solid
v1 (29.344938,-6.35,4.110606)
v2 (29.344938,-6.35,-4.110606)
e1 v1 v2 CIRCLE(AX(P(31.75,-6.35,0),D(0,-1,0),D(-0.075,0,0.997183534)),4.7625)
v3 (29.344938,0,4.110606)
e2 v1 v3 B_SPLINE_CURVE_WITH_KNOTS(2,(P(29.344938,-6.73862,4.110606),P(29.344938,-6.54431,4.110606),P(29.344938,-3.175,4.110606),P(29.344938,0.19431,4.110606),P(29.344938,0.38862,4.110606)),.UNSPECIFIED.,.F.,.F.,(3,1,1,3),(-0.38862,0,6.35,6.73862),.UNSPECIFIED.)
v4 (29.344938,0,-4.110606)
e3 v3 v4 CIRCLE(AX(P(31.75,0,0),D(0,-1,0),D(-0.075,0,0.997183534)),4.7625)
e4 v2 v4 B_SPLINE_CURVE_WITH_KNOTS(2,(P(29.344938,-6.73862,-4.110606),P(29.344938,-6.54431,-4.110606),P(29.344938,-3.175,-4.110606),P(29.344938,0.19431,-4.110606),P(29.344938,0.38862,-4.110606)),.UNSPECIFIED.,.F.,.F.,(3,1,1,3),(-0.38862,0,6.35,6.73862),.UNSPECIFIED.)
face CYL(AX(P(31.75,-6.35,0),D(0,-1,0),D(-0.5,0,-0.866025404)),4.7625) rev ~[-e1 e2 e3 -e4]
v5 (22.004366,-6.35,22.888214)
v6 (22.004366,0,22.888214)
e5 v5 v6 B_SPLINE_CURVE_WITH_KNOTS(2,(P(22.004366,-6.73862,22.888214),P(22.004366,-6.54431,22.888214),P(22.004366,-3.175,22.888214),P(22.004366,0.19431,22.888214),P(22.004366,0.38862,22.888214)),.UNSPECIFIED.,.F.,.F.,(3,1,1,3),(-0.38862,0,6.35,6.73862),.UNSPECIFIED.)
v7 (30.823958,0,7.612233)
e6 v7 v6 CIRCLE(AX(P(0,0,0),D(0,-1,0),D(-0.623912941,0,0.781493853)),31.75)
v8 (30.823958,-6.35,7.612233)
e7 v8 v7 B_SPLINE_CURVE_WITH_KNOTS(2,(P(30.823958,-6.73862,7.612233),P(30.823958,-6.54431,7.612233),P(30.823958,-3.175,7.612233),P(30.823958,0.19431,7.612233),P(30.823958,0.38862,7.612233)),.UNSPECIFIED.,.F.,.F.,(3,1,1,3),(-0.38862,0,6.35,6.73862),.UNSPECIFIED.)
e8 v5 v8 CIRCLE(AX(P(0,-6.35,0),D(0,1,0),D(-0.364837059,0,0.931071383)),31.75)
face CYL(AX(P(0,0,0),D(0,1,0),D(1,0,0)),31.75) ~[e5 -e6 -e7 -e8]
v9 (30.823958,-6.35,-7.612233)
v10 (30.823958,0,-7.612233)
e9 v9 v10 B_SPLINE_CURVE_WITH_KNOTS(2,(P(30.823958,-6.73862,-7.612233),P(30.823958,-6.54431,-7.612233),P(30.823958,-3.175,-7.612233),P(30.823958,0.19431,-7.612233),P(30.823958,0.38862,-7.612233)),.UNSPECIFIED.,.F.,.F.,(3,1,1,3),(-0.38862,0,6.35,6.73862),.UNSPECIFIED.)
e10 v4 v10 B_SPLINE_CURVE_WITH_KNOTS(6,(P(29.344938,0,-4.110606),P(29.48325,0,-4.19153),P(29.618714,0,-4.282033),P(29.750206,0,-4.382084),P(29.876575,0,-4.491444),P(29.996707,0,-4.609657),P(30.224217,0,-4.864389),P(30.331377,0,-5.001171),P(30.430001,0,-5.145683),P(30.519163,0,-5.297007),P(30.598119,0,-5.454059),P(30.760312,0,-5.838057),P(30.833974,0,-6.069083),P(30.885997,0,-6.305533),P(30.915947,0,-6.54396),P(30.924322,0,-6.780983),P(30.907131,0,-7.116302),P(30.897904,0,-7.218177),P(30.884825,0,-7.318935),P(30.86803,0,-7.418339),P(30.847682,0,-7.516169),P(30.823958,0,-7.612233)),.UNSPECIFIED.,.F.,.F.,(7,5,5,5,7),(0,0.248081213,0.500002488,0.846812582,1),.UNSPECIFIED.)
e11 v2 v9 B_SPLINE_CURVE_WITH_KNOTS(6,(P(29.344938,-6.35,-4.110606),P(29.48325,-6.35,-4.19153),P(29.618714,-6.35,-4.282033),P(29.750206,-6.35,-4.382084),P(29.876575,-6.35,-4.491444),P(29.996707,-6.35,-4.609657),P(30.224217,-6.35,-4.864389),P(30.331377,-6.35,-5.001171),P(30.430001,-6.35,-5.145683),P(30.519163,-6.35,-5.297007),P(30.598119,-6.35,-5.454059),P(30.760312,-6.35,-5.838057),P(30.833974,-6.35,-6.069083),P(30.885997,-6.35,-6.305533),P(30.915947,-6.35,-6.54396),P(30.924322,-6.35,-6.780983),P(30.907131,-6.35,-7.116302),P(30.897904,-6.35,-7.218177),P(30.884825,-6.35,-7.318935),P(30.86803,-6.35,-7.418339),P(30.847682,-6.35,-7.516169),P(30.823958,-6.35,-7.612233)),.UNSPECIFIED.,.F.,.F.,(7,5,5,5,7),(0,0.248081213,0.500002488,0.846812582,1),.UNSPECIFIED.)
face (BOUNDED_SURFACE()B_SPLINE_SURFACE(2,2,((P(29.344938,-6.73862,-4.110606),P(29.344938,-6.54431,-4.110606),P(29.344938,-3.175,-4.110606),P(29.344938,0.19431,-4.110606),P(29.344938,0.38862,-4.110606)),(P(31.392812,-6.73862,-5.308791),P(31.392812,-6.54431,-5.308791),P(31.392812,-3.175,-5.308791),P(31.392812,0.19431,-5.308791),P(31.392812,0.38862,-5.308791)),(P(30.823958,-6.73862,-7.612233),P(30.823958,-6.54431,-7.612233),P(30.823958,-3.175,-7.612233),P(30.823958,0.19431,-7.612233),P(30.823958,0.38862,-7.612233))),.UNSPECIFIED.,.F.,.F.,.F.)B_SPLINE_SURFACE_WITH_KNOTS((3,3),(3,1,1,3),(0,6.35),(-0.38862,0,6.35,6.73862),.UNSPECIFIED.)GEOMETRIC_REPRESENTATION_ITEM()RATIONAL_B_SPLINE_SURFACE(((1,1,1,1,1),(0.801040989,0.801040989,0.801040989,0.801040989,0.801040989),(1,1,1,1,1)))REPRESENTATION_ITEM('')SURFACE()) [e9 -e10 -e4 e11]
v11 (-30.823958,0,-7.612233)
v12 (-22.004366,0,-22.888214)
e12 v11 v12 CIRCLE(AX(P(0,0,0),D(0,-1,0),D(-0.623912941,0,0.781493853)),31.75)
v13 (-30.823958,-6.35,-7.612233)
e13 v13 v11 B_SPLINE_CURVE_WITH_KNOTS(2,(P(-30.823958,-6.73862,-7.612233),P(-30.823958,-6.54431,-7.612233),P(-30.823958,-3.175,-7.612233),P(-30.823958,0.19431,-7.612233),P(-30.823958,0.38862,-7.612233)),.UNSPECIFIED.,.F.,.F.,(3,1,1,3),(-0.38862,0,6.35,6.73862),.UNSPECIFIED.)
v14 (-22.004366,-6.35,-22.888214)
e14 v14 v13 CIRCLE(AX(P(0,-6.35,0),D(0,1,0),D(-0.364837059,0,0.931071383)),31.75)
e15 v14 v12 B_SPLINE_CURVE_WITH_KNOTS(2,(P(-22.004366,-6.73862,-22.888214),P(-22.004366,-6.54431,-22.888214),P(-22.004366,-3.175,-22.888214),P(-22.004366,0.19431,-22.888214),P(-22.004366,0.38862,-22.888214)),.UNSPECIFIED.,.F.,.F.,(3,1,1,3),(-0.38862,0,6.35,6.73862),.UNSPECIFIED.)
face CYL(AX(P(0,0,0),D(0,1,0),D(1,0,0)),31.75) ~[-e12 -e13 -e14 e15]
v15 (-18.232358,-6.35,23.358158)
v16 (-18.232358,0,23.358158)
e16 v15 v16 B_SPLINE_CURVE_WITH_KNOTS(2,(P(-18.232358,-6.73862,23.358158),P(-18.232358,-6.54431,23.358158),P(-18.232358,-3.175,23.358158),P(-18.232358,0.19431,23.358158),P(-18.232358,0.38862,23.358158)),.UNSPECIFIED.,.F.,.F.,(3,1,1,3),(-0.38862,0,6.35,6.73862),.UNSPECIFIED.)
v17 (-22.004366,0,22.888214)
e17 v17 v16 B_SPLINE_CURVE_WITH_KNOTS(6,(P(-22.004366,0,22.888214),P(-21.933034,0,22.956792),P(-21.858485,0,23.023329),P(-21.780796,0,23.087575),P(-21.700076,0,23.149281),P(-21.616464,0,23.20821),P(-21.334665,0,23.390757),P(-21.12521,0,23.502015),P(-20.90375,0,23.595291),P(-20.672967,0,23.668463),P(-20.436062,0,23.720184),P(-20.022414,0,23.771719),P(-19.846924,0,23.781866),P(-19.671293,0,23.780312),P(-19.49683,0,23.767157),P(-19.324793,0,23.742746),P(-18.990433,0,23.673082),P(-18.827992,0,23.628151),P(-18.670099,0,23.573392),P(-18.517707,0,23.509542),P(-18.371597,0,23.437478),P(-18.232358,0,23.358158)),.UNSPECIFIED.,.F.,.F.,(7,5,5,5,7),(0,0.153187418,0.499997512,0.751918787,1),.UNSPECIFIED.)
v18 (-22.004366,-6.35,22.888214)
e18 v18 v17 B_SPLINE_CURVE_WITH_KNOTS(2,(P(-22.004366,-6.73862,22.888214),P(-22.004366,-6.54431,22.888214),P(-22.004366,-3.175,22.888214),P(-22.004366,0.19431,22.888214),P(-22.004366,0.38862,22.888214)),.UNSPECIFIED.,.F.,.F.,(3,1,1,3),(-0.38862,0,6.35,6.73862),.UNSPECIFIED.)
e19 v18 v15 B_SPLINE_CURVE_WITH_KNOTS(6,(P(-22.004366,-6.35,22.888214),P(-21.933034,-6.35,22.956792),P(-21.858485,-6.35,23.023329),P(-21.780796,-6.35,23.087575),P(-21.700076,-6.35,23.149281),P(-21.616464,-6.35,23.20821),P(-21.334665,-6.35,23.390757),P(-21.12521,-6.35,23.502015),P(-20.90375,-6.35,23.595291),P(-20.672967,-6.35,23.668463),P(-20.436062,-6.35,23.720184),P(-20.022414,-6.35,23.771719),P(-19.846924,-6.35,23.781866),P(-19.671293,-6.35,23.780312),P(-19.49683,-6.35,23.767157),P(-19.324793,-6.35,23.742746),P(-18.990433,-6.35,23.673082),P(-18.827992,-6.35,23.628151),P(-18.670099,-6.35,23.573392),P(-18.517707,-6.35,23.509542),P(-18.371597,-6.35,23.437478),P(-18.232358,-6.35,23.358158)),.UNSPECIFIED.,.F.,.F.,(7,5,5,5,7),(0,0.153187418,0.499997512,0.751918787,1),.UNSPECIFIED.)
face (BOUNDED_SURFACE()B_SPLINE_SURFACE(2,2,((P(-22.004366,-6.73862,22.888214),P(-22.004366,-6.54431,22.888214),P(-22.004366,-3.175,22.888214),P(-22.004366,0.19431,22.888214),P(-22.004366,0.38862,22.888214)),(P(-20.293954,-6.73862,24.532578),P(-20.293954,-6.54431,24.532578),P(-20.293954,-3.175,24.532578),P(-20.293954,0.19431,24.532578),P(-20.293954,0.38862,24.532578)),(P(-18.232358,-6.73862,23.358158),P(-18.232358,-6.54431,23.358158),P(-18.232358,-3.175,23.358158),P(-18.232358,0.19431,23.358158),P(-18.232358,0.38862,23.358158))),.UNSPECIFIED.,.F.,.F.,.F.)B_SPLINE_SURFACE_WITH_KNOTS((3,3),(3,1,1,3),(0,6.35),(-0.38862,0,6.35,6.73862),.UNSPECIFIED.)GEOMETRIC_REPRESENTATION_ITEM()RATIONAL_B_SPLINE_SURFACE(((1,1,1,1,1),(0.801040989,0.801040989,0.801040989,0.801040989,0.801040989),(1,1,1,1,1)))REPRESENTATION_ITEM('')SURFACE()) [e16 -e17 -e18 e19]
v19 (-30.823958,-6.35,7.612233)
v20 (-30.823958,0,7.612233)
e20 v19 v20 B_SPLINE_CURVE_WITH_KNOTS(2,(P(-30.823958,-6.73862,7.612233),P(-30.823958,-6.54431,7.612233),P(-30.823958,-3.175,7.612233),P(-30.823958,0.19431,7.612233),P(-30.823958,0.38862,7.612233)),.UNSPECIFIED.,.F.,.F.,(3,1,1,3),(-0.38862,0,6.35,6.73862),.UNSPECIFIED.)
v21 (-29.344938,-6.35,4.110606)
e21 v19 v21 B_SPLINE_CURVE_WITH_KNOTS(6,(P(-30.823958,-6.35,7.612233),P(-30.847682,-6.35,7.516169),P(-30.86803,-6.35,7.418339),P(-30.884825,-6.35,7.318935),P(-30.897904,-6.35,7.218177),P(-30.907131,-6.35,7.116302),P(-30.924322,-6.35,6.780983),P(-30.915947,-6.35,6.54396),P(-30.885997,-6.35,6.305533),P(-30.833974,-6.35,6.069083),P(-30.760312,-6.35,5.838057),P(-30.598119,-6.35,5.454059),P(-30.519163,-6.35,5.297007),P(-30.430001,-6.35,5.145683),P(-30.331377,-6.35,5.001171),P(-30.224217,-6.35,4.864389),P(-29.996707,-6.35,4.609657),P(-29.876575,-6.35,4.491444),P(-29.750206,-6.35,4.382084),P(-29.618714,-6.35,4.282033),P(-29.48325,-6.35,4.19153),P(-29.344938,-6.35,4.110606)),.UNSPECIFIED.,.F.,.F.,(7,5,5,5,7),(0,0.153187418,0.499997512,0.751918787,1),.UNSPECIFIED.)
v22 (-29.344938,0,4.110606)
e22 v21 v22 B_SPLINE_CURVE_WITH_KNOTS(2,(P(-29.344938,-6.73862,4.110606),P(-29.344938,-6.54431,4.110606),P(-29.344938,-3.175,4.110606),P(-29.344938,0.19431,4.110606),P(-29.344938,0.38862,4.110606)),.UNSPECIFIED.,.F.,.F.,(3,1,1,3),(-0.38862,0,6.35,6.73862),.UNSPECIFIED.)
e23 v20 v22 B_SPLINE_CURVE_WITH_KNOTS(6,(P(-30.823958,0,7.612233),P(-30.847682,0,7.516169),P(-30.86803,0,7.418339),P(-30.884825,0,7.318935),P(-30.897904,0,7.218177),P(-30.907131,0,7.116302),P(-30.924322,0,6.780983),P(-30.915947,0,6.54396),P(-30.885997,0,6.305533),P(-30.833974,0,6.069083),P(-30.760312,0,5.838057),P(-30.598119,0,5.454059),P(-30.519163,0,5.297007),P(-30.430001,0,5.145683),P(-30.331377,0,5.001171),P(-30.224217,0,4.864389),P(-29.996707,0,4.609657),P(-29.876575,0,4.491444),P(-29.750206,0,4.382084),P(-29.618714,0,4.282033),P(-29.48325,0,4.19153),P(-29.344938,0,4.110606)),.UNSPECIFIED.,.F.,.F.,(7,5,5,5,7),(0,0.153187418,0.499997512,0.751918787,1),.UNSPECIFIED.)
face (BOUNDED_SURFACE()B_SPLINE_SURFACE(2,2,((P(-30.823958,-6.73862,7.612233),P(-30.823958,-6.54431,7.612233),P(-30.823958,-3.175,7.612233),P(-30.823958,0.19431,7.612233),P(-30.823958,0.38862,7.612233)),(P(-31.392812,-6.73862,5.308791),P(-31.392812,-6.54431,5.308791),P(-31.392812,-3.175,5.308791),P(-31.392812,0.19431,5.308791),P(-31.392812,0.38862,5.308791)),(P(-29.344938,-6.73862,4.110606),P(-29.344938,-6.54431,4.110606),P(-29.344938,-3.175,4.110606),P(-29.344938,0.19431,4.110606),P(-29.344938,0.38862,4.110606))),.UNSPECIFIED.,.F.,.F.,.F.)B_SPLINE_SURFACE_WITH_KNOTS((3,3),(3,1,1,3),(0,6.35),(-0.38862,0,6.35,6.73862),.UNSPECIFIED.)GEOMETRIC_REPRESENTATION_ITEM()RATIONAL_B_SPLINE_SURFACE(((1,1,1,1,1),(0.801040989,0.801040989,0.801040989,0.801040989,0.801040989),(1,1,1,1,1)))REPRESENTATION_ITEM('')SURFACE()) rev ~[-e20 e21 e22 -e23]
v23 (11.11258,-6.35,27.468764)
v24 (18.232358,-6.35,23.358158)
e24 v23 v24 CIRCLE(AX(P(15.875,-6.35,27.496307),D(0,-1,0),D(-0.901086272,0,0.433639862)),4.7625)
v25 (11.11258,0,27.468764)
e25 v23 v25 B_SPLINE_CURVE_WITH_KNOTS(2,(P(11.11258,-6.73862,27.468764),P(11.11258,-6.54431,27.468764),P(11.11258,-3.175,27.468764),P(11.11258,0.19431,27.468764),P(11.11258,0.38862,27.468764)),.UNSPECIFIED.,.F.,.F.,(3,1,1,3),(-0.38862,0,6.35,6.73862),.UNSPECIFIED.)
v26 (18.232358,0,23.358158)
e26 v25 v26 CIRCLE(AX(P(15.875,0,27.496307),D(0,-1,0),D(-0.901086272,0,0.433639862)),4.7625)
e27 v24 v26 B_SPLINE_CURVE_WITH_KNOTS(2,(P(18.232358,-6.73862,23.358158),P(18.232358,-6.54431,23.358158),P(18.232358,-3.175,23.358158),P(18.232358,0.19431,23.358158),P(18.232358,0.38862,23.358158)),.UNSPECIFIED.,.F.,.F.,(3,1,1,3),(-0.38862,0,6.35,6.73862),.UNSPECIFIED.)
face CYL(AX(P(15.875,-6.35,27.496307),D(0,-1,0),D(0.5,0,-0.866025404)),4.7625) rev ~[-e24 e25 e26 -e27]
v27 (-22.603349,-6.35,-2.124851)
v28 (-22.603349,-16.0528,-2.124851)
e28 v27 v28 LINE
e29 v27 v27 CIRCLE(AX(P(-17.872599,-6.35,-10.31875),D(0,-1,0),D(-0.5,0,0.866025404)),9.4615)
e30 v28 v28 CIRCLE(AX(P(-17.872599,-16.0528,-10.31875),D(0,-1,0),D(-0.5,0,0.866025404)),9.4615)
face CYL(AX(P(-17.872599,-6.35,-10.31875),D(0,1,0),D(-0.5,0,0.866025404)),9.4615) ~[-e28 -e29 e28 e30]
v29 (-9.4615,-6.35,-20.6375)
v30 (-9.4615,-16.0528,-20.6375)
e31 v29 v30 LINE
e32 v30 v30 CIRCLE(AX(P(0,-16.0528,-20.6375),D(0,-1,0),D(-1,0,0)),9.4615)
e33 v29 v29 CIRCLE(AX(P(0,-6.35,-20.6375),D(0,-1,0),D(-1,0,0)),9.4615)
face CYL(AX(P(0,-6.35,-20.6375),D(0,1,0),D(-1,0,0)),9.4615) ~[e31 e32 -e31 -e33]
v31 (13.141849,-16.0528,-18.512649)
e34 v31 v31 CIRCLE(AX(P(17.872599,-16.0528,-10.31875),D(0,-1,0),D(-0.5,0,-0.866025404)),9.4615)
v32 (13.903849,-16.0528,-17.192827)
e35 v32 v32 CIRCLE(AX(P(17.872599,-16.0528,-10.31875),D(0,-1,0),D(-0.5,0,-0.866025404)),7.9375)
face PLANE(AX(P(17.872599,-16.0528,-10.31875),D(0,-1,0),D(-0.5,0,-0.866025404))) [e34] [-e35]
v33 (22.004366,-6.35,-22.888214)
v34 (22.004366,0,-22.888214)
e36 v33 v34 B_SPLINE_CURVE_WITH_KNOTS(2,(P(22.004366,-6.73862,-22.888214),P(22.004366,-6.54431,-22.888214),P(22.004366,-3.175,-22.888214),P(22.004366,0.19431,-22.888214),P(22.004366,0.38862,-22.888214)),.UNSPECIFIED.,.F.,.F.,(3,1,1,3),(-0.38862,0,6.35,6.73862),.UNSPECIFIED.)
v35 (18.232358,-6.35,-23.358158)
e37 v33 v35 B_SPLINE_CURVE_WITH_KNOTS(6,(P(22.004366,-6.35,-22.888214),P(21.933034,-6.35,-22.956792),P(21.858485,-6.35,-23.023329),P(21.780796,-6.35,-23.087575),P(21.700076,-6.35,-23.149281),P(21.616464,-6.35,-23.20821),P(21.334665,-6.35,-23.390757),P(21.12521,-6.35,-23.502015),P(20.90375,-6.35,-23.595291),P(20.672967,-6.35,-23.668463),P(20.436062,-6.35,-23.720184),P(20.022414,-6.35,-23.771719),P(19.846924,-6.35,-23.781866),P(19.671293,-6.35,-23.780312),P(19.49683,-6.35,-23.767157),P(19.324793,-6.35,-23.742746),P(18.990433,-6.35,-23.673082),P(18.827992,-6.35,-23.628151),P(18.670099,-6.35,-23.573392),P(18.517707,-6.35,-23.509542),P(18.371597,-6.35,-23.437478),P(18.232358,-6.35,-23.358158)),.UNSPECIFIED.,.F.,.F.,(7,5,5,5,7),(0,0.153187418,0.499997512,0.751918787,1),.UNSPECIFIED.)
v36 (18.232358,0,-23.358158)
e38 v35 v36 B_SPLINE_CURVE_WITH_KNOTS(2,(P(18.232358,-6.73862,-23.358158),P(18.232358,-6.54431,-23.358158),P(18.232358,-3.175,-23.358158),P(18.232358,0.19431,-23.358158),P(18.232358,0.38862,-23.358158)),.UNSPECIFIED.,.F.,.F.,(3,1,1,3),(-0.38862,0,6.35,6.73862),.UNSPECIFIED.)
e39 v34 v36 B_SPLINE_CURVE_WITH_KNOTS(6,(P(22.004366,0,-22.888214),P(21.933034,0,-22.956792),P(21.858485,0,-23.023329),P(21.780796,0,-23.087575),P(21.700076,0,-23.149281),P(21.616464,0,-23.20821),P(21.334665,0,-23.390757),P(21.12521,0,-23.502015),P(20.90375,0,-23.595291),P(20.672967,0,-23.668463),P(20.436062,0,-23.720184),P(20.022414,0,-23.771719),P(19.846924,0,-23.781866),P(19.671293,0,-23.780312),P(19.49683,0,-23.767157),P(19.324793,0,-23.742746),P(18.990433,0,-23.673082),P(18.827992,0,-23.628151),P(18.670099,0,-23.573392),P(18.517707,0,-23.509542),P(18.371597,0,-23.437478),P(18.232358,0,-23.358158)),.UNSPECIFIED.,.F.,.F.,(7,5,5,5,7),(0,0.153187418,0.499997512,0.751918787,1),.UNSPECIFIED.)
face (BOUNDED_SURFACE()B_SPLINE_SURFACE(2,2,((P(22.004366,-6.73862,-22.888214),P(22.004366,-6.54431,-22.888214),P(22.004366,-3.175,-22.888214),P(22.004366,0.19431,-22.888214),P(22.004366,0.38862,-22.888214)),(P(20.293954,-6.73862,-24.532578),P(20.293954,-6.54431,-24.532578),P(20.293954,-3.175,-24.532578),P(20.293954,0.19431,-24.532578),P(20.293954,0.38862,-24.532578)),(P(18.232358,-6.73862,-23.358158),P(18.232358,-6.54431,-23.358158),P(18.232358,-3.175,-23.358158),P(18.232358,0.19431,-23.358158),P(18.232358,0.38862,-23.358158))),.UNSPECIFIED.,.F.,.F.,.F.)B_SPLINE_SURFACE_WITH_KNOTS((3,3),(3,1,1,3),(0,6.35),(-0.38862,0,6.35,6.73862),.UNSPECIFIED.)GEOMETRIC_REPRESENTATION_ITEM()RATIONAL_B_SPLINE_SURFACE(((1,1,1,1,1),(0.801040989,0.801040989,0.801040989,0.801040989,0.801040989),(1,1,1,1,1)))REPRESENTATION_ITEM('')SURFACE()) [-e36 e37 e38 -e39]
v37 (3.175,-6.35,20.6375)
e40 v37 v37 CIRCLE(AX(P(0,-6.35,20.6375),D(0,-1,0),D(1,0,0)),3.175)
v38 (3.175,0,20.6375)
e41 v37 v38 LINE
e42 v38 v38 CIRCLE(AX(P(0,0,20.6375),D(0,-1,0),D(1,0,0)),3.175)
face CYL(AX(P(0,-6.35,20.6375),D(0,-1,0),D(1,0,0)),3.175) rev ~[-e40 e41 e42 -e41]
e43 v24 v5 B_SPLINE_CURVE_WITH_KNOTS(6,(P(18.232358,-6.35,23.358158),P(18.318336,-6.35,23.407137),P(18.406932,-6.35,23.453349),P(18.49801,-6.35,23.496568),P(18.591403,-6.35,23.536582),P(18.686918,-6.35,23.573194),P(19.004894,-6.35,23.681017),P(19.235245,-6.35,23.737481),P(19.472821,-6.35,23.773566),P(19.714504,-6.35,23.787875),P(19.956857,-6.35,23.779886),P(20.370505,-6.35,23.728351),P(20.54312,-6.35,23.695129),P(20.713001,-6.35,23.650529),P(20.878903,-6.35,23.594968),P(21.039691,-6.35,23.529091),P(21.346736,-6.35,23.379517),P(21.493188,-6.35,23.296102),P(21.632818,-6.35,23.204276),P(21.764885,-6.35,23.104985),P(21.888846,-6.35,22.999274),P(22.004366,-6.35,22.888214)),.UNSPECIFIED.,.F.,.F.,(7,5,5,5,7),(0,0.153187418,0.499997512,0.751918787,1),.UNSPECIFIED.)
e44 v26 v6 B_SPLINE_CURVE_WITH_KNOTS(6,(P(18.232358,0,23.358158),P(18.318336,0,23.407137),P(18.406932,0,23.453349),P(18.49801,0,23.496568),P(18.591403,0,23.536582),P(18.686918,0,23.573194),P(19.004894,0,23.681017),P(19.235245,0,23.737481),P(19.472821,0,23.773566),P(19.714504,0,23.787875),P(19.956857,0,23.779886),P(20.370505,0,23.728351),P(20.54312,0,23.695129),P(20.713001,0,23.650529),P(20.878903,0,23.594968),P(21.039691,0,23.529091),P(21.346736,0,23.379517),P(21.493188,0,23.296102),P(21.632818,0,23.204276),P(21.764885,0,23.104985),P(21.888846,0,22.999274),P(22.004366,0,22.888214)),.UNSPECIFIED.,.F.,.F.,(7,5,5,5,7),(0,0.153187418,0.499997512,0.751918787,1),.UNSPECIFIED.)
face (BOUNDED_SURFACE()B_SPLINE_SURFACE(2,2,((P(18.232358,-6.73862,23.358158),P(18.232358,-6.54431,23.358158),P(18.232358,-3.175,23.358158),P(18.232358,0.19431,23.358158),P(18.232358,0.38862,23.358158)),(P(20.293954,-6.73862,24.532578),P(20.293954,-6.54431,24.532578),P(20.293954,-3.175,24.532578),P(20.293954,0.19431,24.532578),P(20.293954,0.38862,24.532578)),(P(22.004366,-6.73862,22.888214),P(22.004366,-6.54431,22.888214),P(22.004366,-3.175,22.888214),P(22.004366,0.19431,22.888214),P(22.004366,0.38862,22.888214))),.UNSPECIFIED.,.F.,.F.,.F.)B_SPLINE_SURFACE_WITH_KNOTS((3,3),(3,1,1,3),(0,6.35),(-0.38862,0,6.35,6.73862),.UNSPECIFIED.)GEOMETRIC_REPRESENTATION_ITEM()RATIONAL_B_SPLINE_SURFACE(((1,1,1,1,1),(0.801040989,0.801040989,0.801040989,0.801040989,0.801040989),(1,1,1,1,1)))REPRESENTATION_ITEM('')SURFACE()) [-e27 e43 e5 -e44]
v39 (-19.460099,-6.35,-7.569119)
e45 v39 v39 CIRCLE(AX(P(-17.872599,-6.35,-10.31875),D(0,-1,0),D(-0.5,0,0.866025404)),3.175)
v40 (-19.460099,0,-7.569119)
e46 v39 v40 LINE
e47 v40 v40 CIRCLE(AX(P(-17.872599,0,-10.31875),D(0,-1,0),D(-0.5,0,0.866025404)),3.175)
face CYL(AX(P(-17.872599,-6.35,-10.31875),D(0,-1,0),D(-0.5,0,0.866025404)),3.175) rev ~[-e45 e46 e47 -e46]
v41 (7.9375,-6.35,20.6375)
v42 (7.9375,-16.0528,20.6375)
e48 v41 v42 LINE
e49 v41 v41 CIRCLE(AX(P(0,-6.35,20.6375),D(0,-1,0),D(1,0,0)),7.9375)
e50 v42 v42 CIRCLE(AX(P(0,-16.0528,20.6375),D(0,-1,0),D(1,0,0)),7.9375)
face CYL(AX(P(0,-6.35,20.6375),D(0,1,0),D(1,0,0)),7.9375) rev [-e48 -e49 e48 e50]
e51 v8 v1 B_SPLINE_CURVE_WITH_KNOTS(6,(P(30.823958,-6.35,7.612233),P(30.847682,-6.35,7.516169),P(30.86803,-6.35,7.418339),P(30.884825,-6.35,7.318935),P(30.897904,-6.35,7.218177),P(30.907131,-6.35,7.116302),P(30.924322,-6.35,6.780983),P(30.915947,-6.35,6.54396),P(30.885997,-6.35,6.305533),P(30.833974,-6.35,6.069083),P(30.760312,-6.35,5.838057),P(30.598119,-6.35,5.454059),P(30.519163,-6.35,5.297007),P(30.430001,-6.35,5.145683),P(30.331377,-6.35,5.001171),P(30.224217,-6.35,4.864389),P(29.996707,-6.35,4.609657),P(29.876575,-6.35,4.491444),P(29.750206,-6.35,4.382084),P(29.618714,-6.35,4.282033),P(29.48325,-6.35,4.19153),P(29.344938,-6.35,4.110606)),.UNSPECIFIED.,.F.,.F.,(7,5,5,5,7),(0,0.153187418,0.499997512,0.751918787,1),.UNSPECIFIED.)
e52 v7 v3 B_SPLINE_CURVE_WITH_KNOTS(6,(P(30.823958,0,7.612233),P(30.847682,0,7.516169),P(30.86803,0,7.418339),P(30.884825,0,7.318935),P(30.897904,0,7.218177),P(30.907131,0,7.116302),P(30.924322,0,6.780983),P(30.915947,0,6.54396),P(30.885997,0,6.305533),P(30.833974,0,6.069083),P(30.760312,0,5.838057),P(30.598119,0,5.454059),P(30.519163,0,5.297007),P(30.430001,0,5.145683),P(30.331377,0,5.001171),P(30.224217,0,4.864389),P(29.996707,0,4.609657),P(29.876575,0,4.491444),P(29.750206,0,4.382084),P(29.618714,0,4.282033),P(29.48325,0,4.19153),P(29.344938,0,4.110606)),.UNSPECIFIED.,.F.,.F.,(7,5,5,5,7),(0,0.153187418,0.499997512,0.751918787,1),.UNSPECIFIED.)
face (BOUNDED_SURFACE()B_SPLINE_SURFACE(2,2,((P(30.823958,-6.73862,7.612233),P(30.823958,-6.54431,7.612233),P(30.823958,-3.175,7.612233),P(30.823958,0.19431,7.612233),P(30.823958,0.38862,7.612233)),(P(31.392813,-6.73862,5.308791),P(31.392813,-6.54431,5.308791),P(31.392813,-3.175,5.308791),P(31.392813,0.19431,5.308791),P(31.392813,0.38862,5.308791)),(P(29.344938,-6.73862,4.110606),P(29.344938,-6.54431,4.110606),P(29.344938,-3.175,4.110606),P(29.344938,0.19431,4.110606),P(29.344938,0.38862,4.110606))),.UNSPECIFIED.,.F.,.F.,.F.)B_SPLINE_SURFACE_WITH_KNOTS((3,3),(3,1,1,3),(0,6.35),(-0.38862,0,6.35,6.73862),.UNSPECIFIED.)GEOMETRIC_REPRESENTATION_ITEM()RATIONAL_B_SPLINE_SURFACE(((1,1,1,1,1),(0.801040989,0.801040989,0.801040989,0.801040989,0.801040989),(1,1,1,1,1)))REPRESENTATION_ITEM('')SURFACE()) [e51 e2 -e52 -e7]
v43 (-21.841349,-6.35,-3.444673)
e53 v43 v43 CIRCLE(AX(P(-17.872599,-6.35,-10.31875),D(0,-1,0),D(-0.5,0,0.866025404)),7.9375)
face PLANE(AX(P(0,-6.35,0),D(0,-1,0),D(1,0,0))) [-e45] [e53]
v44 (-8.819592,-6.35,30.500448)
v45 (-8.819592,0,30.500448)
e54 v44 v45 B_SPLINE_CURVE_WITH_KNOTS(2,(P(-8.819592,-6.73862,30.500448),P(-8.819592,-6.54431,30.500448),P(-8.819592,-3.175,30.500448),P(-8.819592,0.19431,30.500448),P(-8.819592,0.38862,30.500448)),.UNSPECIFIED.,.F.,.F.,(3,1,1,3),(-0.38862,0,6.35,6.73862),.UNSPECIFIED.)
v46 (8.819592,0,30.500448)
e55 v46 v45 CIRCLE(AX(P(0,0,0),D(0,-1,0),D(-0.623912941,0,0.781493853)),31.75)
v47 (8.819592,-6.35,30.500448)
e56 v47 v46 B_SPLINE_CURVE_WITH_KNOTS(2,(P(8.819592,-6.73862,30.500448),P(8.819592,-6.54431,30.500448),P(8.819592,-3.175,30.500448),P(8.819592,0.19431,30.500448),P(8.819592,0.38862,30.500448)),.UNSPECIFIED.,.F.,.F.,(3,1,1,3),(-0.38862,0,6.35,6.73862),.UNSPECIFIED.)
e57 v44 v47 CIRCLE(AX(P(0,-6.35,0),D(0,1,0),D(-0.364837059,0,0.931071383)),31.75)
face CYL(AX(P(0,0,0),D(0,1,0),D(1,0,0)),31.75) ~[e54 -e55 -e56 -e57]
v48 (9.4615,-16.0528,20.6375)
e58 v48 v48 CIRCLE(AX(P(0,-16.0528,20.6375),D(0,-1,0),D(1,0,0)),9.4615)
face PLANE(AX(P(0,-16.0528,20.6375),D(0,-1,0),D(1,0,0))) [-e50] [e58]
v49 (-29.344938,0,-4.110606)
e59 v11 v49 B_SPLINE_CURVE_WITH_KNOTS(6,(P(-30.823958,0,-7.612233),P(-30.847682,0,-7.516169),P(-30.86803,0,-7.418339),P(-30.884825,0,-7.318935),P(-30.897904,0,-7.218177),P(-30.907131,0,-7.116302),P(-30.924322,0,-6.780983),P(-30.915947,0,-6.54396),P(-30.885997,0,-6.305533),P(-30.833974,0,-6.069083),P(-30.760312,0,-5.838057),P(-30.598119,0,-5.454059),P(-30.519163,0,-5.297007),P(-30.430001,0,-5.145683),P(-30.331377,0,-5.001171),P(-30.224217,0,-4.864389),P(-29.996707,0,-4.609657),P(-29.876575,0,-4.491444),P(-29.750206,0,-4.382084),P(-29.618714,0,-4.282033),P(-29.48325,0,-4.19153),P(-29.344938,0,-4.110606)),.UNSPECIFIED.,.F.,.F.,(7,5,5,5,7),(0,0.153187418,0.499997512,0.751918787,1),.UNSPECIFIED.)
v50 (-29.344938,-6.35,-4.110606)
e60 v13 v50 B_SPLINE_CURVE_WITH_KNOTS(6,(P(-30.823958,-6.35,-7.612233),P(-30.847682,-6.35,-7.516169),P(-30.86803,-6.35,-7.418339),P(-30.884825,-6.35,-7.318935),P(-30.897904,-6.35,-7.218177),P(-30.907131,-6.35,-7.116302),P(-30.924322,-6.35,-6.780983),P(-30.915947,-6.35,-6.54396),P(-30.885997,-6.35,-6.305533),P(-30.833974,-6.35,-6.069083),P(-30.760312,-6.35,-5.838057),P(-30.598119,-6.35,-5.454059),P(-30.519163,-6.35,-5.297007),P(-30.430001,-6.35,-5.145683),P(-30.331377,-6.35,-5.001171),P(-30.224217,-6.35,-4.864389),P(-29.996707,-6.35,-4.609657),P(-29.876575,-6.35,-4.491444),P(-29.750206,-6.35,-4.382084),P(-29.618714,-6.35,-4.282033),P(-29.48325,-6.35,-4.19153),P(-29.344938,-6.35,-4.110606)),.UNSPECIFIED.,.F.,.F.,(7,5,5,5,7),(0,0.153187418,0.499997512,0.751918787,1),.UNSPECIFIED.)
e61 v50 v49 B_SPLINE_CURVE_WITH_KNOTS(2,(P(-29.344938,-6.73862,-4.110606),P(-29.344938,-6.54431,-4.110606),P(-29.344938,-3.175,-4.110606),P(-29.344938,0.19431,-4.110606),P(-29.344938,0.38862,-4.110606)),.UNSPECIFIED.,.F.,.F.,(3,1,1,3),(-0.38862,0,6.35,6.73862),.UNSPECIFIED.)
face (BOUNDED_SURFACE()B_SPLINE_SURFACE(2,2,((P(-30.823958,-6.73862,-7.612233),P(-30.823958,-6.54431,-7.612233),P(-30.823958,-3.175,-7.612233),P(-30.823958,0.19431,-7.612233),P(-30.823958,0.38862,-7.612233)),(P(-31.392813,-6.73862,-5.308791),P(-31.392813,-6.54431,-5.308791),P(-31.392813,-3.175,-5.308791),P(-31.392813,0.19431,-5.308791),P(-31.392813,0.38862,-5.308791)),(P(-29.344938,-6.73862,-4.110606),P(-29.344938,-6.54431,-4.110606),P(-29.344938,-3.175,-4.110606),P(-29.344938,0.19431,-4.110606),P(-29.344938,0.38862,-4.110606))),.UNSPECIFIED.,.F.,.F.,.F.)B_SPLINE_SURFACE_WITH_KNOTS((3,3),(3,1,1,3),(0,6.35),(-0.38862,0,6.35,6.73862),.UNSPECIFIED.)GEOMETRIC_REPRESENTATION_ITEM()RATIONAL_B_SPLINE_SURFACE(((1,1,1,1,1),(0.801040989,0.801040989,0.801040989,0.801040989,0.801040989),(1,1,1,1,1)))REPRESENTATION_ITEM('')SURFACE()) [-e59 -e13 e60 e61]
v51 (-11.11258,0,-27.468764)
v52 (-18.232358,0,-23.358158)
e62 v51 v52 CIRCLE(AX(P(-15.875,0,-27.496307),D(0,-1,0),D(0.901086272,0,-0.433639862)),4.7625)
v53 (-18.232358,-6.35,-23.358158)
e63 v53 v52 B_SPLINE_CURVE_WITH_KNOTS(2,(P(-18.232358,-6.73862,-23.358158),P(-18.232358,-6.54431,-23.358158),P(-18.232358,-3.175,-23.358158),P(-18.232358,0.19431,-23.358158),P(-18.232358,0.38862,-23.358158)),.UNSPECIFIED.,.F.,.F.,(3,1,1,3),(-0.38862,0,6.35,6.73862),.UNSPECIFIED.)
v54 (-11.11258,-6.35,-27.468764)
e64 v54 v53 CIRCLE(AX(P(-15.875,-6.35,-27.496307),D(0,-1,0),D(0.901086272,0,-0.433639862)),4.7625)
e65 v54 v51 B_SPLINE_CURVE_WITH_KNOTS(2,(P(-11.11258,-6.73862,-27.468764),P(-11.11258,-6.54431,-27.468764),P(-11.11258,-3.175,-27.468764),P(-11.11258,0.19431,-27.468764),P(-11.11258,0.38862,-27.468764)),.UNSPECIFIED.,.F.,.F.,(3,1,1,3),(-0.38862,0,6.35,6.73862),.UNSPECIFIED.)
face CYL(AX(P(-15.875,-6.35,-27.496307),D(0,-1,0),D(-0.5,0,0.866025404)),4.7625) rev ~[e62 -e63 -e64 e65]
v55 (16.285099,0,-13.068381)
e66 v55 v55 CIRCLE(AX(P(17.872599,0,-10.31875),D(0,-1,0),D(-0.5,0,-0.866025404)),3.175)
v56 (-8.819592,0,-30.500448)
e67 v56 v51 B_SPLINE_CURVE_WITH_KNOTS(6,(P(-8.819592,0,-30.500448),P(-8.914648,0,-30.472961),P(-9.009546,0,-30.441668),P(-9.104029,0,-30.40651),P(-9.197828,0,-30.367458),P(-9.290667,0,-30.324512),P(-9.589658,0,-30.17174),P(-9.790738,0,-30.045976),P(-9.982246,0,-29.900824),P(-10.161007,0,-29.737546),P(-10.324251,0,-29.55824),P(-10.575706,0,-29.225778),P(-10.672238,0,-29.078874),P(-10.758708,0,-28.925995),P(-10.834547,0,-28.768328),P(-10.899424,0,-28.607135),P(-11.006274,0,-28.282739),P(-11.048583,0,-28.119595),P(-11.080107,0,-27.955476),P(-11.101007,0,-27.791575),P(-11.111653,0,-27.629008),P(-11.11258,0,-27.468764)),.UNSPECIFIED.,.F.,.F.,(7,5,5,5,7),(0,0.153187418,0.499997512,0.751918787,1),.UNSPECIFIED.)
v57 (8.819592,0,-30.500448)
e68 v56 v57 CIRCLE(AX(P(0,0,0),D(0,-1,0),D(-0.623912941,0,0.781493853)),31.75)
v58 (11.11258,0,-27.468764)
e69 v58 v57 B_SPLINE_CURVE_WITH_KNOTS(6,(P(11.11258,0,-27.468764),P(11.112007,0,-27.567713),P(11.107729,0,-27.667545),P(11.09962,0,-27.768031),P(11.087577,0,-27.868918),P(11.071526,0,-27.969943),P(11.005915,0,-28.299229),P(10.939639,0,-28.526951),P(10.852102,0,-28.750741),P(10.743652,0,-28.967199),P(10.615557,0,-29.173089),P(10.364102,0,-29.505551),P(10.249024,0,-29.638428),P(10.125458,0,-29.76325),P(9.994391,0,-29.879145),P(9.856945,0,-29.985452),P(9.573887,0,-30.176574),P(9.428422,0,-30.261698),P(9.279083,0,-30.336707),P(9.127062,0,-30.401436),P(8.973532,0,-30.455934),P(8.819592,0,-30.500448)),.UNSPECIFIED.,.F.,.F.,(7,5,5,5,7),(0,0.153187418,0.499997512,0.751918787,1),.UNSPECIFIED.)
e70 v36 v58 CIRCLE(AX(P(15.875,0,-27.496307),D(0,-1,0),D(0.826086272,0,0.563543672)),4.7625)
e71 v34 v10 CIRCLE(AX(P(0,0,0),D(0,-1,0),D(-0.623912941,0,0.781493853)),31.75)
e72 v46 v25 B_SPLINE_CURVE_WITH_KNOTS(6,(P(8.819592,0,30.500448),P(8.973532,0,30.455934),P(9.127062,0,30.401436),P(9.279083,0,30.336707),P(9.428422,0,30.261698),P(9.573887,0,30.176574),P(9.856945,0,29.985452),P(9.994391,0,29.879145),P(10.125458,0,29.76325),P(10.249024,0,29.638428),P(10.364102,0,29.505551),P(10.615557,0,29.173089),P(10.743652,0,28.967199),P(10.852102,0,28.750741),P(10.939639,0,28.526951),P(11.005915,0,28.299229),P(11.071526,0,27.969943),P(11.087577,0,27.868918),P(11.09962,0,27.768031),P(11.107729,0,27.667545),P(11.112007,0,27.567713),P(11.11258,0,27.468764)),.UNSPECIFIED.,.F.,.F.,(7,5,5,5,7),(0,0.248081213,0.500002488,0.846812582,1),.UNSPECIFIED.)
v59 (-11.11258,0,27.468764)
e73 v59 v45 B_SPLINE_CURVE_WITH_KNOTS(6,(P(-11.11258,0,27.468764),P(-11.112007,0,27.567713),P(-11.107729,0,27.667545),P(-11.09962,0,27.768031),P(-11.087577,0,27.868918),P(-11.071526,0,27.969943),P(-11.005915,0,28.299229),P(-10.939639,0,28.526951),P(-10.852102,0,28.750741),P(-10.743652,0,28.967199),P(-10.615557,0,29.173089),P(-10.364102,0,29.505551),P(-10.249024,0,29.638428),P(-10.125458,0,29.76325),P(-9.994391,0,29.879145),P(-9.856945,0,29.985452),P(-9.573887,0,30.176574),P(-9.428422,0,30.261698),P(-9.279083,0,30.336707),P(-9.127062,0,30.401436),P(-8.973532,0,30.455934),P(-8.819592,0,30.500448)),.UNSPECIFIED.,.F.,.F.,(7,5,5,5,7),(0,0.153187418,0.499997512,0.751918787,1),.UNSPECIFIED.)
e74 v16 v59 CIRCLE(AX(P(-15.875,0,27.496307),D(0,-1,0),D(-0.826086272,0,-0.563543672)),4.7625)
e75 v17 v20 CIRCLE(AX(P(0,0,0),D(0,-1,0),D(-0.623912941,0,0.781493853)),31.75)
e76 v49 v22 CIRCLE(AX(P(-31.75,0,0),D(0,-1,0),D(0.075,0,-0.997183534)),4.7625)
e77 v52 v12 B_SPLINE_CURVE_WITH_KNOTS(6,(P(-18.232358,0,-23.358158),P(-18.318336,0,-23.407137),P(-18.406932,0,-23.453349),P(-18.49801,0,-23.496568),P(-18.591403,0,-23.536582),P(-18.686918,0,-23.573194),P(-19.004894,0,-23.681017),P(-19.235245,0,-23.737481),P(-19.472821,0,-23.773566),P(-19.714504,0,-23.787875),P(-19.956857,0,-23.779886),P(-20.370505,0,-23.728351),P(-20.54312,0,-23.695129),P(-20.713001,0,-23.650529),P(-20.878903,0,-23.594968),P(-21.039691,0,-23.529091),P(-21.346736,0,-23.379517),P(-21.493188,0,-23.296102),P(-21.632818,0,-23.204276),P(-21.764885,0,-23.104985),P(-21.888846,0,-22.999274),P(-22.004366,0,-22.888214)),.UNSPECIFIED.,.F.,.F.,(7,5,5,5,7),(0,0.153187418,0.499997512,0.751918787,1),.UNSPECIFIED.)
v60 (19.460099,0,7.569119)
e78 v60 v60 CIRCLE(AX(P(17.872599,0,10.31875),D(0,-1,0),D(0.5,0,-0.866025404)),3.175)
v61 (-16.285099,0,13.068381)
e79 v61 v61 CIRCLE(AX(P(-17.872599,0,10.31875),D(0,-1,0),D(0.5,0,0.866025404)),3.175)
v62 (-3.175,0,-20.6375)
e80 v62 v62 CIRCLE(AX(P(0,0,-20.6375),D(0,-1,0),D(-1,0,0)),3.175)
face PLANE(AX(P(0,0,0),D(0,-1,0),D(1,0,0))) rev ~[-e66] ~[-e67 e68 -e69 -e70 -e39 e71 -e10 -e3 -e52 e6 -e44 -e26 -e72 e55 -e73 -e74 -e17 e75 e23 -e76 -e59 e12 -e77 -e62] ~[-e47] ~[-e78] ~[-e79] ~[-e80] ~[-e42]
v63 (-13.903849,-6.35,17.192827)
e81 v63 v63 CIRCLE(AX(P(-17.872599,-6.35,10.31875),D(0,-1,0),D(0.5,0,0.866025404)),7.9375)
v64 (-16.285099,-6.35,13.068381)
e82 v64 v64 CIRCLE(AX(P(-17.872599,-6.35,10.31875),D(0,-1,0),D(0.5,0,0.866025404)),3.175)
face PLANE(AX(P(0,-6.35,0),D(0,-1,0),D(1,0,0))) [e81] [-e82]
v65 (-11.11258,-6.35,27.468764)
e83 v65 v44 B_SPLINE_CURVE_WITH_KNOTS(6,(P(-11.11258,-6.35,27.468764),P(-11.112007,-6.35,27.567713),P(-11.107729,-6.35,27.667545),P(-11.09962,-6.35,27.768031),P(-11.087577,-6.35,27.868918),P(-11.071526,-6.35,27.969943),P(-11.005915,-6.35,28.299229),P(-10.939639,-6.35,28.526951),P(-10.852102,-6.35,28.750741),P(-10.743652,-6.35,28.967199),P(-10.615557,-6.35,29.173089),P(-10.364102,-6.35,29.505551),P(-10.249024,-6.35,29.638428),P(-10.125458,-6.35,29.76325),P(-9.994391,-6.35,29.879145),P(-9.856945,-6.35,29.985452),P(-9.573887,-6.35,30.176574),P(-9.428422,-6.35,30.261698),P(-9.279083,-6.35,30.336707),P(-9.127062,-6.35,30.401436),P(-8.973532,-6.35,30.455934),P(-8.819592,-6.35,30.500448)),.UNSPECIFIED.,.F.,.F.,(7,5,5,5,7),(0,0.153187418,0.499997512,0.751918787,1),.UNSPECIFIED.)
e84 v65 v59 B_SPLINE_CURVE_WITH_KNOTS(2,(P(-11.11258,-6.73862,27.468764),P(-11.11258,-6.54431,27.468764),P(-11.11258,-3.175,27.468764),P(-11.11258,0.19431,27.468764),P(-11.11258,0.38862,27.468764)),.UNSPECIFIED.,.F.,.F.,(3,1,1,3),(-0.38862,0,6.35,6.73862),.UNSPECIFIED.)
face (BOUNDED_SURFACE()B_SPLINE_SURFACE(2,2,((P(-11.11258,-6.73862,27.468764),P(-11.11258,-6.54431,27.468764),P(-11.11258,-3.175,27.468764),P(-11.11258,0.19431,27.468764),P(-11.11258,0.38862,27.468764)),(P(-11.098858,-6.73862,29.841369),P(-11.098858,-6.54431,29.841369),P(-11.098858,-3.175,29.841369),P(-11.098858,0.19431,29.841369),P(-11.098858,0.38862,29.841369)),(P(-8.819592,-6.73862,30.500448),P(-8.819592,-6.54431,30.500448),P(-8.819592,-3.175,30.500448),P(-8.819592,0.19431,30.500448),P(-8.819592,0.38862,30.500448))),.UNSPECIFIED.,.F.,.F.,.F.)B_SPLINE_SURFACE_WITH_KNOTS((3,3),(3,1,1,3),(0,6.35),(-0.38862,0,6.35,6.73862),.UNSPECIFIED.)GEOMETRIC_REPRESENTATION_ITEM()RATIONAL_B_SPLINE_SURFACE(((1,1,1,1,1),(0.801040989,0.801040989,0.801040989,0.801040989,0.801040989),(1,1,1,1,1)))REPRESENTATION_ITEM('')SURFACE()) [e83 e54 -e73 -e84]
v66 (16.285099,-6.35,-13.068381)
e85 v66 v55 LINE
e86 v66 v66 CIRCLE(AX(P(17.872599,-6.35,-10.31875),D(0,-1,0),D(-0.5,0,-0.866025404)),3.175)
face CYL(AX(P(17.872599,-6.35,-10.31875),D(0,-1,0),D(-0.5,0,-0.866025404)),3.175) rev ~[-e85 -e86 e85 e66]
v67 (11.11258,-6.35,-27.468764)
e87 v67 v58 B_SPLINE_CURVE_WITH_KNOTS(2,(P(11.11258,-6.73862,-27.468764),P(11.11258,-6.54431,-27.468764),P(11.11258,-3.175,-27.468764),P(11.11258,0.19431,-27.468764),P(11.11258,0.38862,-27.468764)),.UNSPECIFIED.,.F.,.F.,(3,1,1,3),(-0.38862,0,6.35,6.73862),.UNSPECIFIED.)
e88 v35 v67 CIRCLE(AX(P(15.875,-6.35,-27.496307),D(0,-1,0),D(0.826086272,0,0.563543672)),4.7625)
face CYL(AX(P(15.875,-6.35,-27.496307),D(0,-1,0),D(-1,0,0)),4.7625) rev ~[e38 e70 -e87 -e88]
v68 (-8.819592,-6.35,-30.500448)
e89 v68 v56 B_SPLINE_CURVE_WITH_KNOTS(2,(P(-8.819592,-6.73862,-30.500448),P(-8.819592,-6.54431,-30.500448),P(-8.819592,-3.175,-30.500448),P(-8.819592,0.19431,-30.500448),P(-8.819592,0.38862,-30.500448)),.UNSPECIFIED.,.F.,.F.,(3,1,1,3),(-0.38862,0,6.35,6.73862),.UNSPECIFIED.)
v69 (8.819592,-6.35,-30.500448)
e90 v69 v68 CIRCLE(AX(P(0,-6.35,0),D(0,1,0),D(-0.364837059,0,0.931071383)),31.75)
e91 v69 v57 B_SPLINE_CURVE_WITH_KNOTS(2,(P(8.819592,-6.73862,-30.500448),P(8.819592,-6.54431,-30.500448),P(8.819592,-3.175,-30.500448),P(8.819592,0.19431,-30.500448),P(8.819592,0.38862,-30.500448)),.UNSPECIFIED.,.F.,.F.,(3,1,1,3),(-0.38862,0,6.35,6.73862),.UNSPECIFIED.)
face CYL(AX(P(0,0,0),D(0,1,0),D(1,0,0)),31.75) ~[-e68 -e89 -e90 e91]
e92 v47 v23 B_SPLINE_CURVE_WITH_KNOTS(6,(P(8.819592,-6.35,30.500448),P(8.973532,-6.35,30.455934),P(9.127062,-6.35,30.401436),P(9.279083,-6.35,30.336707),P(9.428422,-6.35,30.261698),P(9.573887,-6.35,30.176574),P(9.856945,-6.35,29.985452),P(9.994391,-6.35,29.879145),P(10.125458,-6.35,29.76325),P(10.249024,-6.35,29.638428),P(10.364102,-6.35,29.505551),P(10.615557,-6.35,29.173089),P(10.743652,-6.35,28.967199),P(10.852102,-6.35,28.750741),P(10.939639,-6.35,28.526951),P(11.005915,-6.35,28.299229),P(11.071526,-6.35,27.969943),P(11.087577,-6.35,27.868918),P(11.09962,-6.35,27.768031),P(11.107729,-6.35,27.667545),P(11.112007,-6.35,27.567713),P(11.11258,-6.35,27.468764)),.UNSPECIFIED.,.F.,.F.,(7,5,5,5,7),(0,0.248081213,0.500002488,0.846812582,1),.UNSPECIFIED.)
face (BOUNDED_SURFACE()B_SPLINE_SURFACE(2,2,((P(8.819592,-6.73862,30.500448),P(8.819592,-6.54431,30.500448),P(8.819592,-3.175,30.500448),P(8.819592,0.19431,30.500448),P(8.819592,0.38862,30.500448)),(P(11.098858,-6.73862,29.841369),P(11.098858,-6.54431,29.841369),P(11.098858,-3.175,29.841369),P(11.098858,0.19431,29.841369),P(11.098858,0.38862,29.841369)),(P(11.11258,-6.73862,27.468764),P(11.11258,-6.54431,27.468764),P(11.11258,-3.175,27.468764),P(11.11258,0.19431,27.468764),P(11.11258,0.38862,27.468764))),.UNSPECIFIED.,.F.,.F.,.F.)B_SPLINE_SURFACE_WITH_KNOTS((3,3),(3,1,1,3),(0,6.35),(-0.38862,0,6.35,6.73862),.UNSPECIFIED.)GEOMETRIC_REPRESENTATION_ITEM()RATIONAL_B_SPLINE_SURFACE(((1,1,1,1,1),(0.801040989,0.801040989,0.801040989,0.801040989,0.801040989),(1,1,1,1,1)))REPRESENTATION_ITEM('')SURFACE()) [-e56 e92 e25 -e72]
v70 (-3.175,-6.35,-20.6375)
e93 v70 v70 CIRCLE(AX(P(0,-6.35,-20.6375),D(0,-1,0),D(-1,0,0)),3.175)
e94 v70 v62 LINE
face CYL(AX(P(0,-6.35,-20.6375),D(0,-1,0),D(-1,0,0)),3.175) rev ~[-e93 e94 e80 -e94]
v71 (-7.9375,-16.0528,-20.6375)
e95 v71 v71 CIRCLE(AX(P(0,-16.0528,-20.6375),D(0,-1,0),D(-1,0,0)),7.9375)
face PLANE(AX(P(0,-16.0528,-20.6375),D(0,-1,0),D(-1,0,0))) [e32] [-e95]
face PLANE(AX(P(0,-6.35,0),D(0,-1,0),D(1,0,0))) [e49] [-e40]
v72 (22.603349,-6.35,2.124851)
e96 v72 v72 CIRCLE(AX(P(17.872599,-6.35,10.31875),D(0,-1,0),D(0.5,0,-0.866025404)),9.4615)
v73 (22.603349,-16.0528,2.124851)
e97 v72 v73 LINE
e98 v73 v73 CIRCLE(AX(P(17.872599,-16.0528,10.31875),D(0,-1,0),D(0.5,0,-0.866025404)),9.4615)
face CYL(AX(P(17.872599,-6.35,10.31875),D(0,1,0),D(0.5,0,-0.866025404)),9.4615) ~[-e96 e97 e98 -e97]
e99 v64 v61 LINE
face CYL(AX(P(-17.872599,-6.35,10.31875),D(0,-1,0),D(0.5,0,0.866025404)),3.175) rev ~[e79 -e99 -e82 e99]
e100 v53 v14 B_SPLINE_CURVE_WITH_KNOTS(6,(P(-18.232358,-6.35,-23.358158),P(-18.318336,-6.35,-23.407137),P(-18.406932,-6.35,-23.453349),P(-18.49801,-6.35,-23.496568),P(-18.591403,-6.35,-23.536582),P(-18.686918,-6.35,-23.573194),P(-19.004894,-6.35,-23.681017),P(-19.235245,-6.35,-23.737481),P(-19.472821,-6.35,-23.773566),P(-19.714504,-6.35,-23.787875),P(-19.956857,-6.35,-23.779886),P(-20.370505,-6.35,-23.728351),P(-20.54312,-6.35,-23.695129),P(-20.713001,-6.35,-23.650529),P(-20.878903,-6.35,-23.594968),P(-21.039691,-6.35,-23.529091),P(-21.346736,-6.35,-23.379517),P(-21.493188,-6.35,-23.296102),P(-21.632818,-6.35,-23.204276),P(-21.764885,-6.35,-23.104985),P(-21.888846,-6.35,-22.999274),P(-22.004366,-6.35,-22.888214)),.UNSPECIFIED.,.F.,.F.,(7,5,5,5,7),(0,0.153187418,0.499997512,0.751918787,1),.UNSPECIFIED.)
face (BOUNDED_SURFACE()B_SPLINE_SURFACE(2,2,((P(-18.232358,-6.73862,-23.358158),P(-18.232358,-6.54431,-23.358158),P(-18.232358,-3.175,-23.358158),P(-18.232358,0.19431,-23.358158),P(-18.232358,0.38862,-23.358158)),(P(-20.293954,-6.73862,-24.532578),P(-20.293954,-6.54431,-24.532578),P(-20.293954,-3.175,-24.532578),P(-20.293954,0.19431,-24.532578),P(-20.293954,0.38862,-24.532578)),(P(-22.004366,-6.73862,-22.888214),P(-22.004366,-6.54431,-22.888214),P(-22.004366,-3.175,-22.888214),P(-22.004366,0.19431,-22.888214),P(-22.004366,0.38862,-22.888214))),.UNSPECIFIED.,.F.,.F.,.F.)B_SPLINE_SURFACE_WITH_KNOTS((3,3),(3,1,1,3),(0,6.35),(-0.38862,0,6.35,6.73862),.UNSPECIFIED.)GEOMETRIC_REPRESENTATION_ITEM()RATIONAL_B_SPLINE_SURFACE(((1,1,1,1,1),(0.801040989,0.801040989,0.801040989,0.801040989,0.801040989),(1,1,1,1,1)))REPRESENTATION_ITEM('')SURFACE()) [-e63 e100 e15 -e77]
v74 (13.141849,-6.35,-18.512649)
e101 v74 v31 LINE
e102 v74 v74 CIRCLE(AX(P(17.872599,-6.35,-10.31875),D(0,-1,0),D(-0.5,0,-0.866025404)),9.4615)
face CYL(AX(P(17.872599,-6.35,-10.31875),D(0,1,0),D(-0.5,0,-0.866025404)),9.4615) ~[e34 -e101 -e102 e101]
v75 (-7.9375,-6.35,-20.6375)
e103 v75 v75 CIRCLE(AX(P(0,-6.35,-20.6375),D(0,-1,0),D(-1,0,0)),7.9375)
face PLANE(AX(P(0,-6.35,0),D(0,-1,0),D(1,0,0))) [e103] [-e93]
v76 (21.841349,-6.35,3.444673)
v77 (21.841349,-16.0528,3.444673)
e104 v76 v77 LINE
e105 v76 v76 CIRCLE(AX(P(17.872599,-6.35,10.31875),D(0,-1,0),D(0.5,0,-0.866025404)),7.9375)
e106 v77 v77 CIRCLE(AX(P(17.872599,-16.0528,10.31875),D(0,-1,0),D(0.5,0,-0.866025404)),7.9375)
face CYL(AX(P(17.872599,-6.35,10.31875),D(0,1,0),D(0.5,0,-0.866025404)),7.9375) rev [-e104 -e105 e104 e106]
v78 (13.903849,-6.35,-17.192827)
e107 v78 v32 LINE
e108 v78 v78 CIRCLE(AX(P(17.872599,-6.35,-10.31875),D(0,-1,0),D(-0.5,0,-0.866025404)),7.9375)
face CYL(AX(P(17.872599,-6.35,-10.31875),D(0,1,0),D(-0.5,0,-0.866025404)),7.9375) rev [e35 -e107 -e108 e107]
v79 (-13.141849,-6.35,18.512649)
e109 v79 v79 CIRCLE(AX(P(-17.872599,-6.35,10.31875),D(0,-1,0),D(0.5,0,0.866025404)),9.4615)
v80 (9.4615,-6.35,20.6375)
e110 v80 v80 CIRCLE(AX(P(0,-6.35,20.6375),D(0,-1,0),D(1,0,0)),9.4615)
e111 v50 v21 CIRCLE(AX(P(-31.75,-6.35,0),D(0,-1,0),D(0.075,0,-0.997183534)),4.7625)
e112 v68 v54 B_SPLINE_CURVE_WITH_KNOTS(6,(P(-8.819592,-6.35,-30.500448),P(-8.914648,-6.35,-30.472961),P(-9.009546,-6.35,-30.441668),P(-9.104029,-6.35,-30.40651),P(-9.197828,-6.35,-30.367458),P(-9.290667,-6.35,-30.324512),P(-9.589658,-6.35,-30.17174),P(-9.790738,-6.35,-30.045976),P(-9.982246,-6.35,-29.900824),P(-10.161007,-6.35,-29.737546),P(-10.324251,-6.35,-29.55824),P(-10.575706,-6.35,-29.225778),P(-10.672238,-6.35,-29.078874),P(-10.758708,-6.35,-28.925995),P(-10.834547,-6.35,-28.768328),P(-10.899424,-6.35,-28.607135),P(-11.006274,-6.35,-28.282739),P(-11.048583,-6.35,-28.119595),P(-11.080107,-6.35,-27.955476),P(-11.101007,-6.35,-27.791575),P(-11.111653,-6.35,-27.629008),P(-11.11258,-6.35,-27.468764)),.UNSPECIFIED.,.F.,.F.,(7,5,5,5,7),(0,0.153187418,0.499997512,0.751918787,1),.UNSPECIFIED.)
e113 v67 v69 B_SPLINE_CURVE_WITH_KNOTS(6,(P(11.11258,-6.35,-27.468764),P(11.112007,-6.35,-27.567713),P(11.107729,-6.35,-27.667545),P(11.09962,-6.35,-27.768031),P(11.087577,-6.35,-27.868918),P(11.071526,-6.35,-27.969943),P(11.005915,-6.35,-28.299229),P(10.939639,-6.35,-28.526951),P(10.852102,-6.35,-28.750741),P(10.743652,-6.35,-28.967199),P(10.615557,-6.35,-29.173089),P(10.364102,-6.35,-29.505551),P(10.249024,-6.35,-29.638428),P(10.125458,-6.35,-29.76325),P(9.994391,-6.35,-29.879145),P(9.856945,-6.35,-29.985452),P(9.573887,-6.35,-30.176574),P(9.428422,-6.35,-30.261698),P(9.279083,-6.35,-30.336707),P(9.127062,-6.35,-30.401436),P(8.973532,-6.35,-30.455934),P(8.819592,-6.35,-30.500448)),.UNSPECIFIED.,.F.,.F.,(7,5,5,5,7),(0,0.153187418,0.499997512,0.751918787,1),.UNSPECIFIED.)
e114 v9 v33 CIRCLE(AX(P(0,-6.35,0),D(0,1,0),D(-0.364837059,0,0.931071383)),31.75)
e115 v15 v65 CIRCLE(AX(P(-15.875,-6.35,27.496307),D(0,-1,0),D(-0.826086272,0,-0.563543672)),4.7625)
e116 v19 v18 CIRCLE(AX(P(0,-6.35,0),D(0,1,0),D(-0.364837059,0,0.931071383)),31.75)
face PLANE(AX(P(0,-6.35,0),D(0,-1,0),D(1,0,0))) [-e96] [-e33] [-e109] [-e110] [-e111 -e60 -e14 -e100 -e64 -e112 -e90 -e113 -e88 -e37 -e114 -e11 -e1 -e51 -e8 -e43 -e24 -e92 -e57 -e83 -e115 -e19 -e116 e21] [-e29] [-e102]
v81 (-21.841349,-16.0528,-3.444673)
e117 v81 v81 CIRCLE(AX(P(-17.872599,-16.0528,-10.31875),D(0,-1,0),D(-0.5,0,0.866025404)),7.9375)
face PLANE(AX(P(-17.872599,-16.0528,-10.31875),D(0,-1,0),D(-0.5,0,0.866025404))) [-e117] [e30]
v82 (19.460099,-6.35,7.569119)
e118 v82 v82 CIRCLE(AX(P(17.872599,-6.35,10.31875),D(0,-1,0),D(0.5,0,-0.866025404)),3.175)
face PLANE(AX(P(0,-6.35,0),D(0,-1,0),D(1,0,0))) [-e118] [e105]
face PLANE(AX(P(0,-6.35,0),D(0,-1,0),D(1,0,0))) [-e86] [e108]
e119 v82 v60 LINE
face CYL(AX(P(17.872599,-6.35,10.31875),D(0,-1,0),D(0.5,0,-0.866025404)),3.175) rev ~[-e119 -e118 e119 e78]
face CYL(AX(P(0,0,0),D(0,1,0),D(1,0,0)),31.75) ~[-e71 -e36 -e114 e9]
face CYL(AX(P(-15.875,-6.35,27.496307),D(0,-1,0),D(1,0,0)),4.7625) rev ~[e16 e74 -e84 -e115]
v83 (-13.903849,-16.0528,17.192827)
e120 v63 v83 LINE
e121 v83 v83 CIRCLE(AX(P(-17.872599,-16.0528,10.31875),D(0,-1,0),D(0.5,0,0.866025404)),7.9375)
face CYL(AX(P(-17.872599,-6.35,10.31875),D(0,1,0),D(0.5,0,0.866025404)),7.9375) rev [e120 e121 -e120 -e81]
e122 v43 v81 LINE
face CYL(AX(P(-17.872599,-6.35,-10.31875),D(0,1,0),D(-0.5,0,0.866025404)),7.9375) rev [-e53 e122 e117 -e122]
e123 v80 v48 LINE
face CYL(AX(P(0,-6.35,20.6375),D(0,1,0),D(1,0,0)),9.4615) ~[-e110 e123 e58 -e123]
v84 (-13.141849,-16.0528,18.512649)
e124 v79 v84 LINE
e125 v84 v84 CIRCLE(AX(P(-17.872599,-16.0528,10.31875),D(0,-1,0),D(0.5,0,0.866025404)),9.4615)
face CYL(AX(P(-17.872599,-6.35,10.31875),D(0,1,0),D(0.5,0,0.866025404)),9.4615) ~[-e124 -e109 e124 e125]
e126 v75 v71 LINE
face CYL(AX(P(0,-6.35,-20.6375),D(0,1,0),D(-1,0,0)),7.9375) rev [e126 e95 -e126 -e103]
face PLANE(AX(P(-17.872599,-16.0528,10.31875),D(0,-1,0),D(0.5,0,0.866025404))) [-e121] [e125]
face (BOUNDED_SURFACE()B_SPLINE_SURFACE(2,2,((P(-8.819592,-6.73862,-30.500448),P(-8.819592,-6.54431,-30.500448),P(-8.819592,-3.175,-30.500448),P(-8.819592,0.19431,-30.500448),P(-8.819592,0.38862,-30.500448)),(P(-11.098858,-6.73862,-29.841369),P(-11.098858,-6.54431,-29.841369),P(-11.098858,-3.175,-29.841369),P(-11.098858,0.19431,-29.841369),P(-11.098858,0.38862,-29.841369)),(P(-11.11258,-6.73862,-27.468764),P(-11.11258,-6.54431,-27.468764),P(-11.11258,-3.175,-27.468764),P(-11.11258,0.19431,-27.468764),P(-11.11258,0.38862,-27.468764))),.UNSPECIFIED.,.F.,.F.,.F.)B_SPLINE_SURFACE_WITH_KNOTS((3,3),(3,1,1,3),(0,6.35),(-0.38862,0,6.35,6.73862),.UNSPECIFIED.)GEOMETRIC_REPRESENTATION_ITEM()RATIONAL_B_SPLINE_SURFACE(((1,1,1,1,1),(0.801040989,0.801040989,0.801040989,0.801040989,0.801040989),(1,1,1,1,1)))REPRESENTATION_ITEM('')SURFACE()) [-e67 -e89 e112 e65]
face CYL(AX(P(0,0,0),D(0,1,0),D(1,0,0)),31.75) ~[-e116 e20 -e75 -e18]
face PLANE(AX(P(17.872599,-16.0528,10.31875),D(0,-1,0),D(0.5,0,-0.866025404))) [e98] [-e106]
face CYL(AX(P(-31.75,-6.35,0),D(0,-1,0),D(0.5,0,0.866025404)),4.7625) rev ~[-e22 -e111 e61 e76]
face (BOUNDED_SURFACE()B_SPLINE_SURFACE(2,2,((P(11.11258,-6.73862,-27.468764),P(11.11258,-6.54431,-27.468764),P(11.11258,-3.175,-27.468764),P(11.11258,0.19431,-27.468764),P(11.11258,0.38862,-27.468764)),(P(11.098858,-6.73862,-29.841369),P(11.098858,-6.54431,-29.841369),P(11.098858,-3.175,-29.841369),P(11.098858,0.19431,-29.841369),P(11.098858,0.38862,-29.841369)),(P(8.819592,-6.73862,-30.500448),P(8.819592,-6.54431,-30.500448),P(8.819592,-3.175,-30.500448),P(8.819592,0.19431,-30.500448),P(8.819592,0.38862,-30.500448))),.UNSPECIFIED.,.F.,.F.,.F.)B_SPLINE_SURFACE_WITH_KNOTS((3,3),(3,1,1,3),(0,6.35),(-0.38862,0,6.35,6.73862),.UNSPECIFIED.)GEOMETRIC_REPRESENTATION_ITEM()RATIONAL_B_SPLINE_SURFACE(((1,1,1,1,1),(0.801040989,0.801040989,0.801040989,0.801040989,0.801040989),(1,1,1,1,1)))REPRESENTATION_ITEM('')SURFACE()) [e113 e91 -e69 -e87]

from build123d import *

# Parameters (mm, degrees)
F0_R            = 31.75
F1_DEPTH        = 6.35
F2_R            = 4.7625
F3_DEPTH        = 6.351
F3_COPIES_COUNT = 6
F4_R            = 3.175
F5_R            = 3.175
F6_DEPTH        = 6.3510001
F6_COPIES_COUNT = 6
F7_R            = 9.4615
F7_R_2          = 7.9375
F8_DEPTH        = 9.7028
F8_COPIES_COUNT = 6


# Not quite as in the source:
# - a pattern or mirror of a feature is missing from the dataset's text; its kind, count and spacing are read off the source's solid


with BuildPart() as f1:
    # F0 (on Front) → F1 (new body)
    with BuildSketch(Plane.XZ):
        Circle(F0_R)
    extrude(amount=F1_DEPTH)

    # F2 (on face) → F3 (cut, through all)
    with BuildSketch(Plane.XZ.offset(6.35)):
        with Locations((-15.875, 27.4963065702)):
            Circle(F2_R)
    f3 = extrude(amount=-F3_DEPTH, mode=Mode.SUBTRACT)

    # F3_copies: F3 ×6 about axis
    f3_copies_axis = Axis((0, 0, 0), (0, 1, 0))
    for i in range(1, F3_COPIES_COUNT):
        add(f3.rotate(f3_copies_axis, i * 360 / F3_COPIES_COUNT), mode=Mode.SUBTRACT)

    # F4
    f4_edges = [f1.edges().sort_by_distance(p)[0] for p in [
        (-19.809236, -3.175, 24.81243),
        (-11.583577, -3.175, 29.561516),
        (-31.392813, -3.175, 4.749087),
        (11.583577, -3.175, 29.561516),
        (19.809236, -3.175, 24.81243),
        (31.392813, -3.175, 4.749087),
        (31.392813, -3.175, -4.749087),
        (19.809236, -3.175, -24.81243),
        (11.583577, -3.175, -29.561516),
        (-11.583577, -3.175, -29.561516),
        (-19.809236, -3.175, -24.81243),
        (-31.392813, -3.175, -4.749087),
    ]]
    fillet(f4_edges, radius=F4_R)

    # F5 (on face) → F6 (cut, through all)
    with BuildSketch(Plane.XZ.offset(6.35)):
        with Locations((0, 20.6375)):
            Circle(F5_R)
    f6 = extrude(amount=-F6_DEPTH, mode=Mode.SUBTRACT)

    # F6_copies: F6 ×6 about axis
    f6_copies_axis = Axis((0, 0, 0), (0, 1, 0))
    for i in range(1, F6_COPIES_COUNT):
        add(f6.rotate(f6_copies_axis, i * 360 / F6_COPIES_COUNT), mode=Mode.SUBTRACT)

    # F7 (on face) → F8 (join)
    with BuildSketch(Plane.XZ.offset(6.35)):
        with Locations((0, 20.6375)):
            Circle(F7_R)
        with Locations((0, 20.6375)):
            Circle(F7_R_2, mode=Mode.SUBTRACT)
    f8 = extrude(amount=F8_DEPTH)

    # F8_copies: F8 ×6 about axis
    f8_copies_axis = Axis((0, 0, 0), (0, 1, 0))
    for i in range(1, F8_COPIES_COUNT):
        add(f8.rotate(f8_copies_axis, i * 360 / F8_COPIES_COUNT))


solid = f1.part
